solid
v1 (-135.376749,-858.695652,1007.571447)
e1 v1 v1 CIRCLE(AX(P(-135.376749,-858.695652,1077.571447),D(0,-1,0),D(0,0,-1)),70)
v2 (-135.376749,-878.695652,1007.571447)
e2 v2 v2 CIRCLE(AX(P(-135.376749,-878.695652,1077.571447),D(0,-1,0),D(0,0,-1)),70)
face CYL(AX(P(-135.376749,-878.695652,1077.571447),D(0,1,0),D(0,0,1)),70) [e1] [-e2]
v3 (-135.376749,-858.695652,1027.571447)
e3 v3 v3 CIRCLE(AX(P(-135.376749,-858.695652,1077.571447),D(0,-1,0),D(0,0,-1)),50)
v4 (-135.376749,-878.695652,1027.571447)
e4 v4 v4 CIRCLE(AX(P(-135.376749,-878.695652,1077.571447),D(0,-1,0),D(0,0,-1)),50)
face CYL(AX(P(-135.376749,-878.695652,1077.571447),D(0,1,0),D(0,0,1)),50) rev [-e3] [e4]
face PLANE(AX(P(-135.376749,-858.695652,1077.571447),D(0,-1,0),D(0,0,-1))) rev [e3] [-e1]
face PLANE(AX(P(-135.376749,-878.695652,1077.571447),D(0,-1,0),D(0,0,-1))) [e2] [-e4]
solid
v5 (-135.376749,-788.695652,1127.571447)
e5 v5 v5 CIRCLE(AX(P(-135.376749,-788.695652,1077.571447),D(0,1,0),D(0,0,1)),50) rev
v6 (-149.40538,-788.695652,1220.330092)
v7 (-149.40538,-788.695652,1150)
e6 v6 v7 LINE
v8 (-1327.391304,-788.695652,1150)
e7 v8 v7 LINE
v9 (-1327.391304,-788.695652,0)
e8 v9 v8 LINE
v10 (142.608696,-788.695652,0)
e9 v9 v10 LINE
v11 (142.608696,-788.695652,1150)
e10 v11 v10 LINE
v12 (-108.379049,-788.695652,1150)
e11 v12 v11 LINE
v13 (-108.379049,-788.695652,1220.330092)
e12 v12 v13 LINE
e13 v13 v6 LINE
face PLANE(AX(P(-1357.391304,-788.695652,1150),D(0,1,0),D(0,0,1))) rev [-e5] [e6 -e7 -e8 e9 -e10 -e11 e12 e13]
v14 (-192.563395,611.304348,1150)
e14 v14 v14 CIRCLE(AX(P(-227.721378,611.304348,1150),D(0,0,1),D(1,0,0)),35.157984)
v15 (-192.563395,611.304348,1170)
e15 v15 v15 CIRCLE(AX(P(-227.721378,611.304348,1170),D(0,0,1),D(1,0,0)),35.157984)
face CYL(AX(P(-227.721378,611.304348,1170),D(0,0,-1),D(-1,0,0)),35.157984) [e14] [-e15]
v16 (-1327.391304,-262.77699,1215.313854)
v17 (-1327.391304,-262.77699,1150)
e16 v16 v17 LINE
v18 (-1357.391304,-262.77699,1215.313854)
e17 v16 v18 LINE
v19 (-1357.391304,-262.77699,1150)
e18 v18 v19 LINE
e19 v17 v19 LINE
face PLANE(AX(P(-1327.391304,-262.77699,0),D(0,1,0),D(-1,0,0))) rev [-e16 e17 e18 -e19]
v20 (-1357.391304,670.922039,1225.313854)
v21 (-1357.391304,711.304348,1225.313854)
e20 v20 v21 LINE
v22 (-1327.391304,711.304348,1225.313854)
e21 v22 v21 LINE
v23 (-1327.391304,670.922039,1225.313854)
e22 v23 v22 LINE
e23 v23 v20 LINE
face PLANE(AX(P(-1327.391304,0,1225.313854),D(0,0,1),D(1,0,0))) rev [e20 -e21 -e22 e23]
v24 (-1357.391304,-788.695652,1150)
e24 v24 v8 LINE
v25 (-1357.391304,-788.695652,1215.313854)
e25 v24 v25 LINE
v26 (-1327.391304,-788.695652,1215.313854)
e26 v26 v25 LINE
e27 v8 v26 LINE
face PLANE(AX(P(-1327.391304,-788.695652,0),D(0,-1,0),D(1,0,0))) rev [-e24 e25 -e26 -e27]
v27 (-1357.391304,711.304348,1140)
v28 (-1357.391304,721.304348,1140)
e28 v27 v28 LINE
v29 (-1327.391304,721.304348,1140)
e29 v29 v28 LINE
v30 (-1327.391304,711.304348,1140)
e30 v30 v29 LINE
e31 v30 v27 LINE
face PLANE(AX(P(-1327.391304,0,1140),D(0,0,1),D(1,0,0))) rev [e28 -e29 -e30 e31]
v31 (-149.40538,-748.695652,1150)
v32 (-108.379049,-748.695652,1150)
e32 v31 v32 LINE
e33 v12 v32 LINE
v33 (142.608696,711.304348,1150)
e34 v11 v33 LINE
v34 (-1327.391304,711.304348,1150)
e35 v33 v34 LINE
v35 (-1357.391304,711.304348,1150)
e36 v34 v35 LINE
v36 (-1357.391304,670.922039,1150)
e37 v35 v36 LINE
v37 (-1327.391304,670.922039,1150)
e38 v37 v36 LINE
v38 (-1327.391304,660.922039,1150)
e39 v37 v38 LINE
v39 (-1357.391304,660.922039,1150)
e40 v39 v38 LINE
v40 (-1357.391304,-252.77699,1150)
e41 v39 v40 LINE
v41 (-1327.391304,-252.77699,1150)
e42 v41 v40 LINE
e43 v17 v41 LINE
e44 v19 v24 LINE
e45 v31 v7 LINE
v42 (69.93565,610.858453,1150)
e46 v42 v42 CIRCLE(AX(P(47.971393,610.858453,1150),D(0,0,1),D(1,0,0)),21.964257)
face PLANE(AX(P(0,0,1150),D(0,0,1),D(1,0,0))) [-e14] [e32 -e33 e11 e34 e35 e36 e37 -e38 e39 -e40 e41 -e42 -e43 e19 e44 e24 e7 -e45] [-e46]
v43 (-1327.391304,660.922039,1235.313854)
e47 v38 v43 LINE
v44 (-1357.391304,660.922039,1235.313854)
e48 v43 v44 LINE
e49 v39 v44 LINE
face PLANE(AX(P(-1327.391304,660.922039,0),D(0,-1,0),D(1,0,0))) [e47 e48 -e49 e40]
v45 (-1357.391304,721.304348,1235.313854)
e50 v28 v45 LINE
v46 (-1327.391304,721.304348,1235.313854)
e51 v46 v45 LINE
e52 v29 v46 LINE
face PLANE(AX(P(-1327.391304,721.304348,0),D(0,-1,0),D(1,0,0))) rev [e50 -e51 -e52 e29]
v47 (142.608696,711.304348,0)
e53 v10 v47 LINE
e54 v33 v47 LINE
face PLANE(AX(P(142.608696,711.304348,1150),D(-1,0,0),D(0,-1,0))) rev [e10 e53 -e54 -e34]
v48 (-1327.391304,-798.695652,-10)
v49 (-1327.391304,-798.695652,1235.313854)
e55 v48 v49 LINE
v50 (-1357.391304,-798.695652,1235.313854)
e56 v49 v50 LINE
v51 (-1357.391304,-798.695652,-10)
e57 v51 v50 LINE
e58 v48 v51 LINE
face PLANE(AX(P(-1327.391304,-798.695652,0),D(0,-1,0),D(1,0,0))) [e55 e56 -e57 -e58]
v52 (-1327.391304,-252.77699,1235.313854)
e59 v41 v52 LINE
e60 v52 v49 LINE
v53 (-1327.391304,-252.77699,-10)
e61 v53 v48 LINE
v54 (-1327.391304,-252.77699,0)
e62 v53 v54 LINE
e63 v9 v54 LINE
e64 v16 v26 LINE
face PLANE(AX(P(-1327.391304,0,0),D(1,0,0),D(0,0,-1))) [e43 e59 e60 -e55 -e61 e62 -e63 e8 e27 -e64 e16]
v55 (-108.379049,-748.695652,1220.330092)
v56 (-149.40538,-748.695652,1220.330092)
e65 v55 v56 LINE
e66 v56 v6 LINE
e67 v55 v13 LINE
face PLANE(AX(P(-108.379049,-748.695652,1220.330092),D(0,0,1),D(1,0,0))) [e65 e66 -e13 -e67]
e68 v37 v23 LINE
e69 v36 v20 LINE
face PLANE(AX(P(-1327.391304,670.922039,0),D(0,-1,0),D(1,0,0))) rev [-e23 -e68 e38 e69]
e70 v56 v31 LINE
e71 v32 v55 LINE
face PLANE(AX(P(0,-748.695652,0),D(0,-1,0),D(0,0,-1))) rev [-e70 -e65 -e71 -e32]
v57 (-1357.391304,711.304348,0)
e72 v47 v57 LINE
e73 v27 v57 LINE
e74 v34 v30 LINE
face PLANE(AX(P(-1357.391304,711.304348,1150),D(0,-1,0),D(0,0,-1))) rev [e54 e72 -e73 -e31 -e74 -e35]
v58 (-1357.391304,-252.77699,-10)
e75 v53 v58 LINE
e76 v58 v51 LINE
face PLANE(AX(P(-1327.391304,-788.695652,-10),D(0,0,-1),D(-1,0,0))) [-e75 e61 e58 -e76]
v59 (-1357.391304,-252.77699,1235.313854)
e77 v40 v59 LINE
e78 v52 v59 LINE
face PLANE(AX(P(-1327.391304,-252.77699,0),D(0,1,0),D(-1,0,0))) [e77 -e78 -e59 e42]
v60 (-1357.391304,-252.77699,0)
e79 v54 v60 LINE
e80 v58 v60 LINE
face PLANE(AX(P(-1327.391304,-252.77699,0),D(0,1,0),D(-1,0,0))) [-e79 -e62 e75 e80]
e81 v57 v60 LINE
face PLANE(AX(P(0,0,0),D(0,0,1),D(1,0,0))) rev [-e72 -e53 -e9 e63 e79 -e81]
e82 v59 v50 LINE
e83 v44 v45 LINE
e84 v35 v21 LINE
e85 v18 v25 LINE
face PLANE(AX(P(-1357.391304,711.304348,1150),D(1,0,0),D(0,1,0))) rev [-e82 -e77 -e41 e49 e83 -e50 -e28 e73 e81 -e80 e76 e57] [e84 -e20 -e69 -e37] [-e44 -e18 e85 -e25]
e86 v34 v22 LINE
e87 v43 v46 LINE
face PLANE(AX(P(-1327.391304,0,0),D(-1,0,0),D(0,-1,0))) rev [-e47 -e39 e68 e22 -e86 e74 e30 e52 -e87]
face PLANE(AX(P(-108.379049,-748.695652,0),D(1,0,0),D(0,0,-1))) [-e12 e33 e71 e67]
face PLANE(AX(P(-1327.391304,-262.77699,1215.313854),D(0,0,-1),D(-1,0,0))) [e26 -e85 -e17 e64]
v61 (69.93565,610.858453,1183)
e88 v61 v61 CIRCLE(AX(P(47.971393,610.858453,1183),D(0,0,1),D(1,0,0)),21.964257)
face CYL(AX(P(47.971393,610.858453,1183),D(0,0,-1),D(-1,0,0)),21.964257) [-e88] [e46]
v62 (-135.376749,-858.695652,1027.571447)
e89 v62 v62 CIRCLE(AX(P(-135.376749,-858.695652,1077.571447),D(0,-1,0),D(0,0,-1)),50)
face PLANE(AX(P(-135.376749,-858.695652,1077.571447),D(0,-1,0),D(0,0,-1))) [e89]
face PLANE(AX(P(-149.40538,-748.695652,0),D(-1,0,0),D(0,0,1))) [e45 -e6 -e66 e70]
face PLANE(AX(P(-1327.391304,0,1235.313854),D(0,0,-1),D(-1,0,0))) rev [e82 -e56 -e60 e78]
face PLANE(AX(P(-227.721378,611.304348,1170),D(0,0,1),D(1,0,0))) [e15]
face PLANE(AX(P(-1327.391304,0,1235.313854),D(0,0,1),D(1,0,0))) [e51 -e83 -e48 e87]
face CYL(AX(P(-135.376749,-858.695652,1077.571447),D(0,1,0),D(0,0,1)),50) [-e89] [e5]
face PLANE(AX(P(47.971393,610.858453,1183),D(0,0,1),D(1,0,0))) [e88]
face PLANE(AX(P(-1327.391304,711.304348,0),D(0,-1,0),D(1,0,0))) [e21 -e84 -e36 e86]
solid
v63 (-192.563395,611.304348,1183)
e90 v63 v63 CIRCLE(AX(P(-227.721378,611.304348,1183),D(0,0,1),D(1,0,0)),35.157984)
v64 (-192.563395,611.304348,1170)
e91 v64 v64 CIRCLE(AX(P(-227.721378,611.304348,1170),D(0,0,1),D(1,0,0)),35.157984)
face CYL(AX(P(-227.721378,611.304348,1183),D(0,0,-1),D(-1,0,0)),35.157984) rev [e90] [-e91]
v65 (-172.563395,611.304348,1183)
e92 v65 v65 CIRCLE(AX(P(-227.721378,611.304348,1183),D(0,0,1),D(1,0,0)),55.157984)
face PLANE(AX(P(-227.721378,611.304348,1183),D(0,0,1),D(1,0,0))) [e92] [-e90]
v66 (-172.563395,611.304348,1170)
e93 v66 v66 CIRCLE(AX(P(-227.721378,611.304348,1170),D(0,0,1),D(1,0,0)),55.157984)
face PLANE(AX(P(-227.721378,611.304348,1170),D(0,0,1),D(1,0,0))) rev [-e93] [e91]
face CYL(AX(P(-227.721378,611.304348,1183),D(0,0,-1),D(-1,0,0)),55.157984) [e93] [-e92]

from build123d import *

# Parameters (mm, degrees)
SKETCH1_W           = 1500
SKETCH1_H           = 1500
BOSS_EXTRUDE1_DEPTH = 1150
EXTRUDE_THIN2_START = -30
EXTRUDE_THIN2_DEPTH = 30
SKETCH3_W           = 41.026330883
SKETCH3_H           = 1220.330091563
BOSS_EXTRUDE2_DEPTH = 40
SKETCH4_R           = 50
BOSS_EXTRUDE3_DEPTH = 70
SKETCH5_R           = 70
SKETCH5_R_2         = 50
BOSS_EXTRUDE4_DEPTH = 20
SKETCH6_R           = 35.15798367
BOSS_EXTRUDE5_DEPTH = 20
SKETCH7_R           = 55.15798367
SKETCH7_R_2         = 35.15798367
BOSS_EXTRUDE6_DEPTH = 13
SKETCH8_R           = 21.964256975
BOSS_EXTRUDE7_DEPTH = 33


# Read off the part's stored shape, not the designer's step: Extrude-Thin2
with BuildPart() as part:
    # Sketch1 → Boss-Extrude1 (new body)
    with BuildSketch(Plane.XY):
        with Locations((-607.391304348, -38.695652174)):
            Rectangle(SKETCH1_W, SKETCH1_H)
    extrude(amount=BOSS_EXTRUDE1_DEPTH)

    # Extrude-Thin2 outline → Extrude-Thin2 (add)
    with BuildSketch(Plane.ZY.offset(1357.391304348).offset(EXTRUDE_THIN2_START)):
        Polygon((1140, 721.304347826), (1140, 711.304347826), (1225.313853743, 711.304347826), (1225.313853743, 670.922038878), (1150, 670.922038878), (1150, 660.922038878), (1235.313853743, 660.922038878), (1235.313853743, 721.304347826), align=None)
        Polygon((0, -788.695652174), (0, -252.776990358), (-10, -252.776990358), (-10, -798.695652174), (1235.313853743, -798.695652174), (1235.313853743, -252.776990358), (1150, -252.776990358), (1150, -262.776990358), (1215.313853743, -262.776990358), (1215.313853743, -788.695652174), align=None)
    extrude(amount=EXTRUDE_THIN2_DEPTH)

    # Sketch3 → Boss-Extrude2 (add)
    with BuildSketch(Plane.XZ.offset(788.695652174)):
        with Locations((-128.892214668, 610.165045781)):
            Rectangle(SKETCH3_W, SKETCH3_H)
    extrude(amount=-BOSS_EXTRUDE2_DEPTH)

    # Sketch4 → Boss-Extrude3 (add)
    with BuildSketch(Plane.XZ.offset(788.695652174)):
        with Locations(Location((-135.376748929, 1077.57144651, 0), (0, 0, 90))):
            Circle(SKETCH4_R)
    extrude(amount=BOSS_EXTRUDE3_DEPTH)

    # Sketch6 → Boss-Extrude5 (add)
    with BuildSketch(Plane.XY.offset(1150)):
        with Locations((-227.721378389, 611.304347826)):
            Circle(SKETCH6_R)
    extrude(amount=BOSS_EXTRUDE5_DEPTH)

    # Sketch8 → Boss-Extrude7 (add)
    with BuildSketch(Plane.XY.offset(1150)):
        with Locations((47.971393261, 610.858453258)):
            Circle(SKETCH8_R)
    extrude(amount=BOSS_EXTRUDE7_DEPTH)


with BuildPart() as body_2:
    # Sketch5 → Boss-Extrude4 (new body)
    with BuildSketch(Plane.XZ.offset(858.695652174)):
        with Locations(Location((-135.376748929, 1077.57144651, 0), (0, 0, 270))):
            Circle(SKETCH5_R)
        with Locations(Location((-135.376748929, 1077.57144651, 0), (0, 0, 270))):
            Circle(SKETCH5_R_2, mode=Mode.SUBTRACT)
    extrude(amount=BOSS_EXTRUDE4_DEPTH)


with BuildPart() as body_3:
    # Sketch7 → Boss-Extrude6 (new body)
    with BuildSketch(Plane.XY.offset(1170)):
        with Locations((-227.721378389, 611.304347826)):
            Circle(SKETCH7_R)
        with Locations((-227.721378389, 611.304347826)):
            Circle(SKETCH7_R_2, mode=Mode.SUBTRACT)
    extrude(amount=BOSS_EXTRUDE6_DEPTH)


solid = Compound([part.part, body_2.part, body_3.part])
